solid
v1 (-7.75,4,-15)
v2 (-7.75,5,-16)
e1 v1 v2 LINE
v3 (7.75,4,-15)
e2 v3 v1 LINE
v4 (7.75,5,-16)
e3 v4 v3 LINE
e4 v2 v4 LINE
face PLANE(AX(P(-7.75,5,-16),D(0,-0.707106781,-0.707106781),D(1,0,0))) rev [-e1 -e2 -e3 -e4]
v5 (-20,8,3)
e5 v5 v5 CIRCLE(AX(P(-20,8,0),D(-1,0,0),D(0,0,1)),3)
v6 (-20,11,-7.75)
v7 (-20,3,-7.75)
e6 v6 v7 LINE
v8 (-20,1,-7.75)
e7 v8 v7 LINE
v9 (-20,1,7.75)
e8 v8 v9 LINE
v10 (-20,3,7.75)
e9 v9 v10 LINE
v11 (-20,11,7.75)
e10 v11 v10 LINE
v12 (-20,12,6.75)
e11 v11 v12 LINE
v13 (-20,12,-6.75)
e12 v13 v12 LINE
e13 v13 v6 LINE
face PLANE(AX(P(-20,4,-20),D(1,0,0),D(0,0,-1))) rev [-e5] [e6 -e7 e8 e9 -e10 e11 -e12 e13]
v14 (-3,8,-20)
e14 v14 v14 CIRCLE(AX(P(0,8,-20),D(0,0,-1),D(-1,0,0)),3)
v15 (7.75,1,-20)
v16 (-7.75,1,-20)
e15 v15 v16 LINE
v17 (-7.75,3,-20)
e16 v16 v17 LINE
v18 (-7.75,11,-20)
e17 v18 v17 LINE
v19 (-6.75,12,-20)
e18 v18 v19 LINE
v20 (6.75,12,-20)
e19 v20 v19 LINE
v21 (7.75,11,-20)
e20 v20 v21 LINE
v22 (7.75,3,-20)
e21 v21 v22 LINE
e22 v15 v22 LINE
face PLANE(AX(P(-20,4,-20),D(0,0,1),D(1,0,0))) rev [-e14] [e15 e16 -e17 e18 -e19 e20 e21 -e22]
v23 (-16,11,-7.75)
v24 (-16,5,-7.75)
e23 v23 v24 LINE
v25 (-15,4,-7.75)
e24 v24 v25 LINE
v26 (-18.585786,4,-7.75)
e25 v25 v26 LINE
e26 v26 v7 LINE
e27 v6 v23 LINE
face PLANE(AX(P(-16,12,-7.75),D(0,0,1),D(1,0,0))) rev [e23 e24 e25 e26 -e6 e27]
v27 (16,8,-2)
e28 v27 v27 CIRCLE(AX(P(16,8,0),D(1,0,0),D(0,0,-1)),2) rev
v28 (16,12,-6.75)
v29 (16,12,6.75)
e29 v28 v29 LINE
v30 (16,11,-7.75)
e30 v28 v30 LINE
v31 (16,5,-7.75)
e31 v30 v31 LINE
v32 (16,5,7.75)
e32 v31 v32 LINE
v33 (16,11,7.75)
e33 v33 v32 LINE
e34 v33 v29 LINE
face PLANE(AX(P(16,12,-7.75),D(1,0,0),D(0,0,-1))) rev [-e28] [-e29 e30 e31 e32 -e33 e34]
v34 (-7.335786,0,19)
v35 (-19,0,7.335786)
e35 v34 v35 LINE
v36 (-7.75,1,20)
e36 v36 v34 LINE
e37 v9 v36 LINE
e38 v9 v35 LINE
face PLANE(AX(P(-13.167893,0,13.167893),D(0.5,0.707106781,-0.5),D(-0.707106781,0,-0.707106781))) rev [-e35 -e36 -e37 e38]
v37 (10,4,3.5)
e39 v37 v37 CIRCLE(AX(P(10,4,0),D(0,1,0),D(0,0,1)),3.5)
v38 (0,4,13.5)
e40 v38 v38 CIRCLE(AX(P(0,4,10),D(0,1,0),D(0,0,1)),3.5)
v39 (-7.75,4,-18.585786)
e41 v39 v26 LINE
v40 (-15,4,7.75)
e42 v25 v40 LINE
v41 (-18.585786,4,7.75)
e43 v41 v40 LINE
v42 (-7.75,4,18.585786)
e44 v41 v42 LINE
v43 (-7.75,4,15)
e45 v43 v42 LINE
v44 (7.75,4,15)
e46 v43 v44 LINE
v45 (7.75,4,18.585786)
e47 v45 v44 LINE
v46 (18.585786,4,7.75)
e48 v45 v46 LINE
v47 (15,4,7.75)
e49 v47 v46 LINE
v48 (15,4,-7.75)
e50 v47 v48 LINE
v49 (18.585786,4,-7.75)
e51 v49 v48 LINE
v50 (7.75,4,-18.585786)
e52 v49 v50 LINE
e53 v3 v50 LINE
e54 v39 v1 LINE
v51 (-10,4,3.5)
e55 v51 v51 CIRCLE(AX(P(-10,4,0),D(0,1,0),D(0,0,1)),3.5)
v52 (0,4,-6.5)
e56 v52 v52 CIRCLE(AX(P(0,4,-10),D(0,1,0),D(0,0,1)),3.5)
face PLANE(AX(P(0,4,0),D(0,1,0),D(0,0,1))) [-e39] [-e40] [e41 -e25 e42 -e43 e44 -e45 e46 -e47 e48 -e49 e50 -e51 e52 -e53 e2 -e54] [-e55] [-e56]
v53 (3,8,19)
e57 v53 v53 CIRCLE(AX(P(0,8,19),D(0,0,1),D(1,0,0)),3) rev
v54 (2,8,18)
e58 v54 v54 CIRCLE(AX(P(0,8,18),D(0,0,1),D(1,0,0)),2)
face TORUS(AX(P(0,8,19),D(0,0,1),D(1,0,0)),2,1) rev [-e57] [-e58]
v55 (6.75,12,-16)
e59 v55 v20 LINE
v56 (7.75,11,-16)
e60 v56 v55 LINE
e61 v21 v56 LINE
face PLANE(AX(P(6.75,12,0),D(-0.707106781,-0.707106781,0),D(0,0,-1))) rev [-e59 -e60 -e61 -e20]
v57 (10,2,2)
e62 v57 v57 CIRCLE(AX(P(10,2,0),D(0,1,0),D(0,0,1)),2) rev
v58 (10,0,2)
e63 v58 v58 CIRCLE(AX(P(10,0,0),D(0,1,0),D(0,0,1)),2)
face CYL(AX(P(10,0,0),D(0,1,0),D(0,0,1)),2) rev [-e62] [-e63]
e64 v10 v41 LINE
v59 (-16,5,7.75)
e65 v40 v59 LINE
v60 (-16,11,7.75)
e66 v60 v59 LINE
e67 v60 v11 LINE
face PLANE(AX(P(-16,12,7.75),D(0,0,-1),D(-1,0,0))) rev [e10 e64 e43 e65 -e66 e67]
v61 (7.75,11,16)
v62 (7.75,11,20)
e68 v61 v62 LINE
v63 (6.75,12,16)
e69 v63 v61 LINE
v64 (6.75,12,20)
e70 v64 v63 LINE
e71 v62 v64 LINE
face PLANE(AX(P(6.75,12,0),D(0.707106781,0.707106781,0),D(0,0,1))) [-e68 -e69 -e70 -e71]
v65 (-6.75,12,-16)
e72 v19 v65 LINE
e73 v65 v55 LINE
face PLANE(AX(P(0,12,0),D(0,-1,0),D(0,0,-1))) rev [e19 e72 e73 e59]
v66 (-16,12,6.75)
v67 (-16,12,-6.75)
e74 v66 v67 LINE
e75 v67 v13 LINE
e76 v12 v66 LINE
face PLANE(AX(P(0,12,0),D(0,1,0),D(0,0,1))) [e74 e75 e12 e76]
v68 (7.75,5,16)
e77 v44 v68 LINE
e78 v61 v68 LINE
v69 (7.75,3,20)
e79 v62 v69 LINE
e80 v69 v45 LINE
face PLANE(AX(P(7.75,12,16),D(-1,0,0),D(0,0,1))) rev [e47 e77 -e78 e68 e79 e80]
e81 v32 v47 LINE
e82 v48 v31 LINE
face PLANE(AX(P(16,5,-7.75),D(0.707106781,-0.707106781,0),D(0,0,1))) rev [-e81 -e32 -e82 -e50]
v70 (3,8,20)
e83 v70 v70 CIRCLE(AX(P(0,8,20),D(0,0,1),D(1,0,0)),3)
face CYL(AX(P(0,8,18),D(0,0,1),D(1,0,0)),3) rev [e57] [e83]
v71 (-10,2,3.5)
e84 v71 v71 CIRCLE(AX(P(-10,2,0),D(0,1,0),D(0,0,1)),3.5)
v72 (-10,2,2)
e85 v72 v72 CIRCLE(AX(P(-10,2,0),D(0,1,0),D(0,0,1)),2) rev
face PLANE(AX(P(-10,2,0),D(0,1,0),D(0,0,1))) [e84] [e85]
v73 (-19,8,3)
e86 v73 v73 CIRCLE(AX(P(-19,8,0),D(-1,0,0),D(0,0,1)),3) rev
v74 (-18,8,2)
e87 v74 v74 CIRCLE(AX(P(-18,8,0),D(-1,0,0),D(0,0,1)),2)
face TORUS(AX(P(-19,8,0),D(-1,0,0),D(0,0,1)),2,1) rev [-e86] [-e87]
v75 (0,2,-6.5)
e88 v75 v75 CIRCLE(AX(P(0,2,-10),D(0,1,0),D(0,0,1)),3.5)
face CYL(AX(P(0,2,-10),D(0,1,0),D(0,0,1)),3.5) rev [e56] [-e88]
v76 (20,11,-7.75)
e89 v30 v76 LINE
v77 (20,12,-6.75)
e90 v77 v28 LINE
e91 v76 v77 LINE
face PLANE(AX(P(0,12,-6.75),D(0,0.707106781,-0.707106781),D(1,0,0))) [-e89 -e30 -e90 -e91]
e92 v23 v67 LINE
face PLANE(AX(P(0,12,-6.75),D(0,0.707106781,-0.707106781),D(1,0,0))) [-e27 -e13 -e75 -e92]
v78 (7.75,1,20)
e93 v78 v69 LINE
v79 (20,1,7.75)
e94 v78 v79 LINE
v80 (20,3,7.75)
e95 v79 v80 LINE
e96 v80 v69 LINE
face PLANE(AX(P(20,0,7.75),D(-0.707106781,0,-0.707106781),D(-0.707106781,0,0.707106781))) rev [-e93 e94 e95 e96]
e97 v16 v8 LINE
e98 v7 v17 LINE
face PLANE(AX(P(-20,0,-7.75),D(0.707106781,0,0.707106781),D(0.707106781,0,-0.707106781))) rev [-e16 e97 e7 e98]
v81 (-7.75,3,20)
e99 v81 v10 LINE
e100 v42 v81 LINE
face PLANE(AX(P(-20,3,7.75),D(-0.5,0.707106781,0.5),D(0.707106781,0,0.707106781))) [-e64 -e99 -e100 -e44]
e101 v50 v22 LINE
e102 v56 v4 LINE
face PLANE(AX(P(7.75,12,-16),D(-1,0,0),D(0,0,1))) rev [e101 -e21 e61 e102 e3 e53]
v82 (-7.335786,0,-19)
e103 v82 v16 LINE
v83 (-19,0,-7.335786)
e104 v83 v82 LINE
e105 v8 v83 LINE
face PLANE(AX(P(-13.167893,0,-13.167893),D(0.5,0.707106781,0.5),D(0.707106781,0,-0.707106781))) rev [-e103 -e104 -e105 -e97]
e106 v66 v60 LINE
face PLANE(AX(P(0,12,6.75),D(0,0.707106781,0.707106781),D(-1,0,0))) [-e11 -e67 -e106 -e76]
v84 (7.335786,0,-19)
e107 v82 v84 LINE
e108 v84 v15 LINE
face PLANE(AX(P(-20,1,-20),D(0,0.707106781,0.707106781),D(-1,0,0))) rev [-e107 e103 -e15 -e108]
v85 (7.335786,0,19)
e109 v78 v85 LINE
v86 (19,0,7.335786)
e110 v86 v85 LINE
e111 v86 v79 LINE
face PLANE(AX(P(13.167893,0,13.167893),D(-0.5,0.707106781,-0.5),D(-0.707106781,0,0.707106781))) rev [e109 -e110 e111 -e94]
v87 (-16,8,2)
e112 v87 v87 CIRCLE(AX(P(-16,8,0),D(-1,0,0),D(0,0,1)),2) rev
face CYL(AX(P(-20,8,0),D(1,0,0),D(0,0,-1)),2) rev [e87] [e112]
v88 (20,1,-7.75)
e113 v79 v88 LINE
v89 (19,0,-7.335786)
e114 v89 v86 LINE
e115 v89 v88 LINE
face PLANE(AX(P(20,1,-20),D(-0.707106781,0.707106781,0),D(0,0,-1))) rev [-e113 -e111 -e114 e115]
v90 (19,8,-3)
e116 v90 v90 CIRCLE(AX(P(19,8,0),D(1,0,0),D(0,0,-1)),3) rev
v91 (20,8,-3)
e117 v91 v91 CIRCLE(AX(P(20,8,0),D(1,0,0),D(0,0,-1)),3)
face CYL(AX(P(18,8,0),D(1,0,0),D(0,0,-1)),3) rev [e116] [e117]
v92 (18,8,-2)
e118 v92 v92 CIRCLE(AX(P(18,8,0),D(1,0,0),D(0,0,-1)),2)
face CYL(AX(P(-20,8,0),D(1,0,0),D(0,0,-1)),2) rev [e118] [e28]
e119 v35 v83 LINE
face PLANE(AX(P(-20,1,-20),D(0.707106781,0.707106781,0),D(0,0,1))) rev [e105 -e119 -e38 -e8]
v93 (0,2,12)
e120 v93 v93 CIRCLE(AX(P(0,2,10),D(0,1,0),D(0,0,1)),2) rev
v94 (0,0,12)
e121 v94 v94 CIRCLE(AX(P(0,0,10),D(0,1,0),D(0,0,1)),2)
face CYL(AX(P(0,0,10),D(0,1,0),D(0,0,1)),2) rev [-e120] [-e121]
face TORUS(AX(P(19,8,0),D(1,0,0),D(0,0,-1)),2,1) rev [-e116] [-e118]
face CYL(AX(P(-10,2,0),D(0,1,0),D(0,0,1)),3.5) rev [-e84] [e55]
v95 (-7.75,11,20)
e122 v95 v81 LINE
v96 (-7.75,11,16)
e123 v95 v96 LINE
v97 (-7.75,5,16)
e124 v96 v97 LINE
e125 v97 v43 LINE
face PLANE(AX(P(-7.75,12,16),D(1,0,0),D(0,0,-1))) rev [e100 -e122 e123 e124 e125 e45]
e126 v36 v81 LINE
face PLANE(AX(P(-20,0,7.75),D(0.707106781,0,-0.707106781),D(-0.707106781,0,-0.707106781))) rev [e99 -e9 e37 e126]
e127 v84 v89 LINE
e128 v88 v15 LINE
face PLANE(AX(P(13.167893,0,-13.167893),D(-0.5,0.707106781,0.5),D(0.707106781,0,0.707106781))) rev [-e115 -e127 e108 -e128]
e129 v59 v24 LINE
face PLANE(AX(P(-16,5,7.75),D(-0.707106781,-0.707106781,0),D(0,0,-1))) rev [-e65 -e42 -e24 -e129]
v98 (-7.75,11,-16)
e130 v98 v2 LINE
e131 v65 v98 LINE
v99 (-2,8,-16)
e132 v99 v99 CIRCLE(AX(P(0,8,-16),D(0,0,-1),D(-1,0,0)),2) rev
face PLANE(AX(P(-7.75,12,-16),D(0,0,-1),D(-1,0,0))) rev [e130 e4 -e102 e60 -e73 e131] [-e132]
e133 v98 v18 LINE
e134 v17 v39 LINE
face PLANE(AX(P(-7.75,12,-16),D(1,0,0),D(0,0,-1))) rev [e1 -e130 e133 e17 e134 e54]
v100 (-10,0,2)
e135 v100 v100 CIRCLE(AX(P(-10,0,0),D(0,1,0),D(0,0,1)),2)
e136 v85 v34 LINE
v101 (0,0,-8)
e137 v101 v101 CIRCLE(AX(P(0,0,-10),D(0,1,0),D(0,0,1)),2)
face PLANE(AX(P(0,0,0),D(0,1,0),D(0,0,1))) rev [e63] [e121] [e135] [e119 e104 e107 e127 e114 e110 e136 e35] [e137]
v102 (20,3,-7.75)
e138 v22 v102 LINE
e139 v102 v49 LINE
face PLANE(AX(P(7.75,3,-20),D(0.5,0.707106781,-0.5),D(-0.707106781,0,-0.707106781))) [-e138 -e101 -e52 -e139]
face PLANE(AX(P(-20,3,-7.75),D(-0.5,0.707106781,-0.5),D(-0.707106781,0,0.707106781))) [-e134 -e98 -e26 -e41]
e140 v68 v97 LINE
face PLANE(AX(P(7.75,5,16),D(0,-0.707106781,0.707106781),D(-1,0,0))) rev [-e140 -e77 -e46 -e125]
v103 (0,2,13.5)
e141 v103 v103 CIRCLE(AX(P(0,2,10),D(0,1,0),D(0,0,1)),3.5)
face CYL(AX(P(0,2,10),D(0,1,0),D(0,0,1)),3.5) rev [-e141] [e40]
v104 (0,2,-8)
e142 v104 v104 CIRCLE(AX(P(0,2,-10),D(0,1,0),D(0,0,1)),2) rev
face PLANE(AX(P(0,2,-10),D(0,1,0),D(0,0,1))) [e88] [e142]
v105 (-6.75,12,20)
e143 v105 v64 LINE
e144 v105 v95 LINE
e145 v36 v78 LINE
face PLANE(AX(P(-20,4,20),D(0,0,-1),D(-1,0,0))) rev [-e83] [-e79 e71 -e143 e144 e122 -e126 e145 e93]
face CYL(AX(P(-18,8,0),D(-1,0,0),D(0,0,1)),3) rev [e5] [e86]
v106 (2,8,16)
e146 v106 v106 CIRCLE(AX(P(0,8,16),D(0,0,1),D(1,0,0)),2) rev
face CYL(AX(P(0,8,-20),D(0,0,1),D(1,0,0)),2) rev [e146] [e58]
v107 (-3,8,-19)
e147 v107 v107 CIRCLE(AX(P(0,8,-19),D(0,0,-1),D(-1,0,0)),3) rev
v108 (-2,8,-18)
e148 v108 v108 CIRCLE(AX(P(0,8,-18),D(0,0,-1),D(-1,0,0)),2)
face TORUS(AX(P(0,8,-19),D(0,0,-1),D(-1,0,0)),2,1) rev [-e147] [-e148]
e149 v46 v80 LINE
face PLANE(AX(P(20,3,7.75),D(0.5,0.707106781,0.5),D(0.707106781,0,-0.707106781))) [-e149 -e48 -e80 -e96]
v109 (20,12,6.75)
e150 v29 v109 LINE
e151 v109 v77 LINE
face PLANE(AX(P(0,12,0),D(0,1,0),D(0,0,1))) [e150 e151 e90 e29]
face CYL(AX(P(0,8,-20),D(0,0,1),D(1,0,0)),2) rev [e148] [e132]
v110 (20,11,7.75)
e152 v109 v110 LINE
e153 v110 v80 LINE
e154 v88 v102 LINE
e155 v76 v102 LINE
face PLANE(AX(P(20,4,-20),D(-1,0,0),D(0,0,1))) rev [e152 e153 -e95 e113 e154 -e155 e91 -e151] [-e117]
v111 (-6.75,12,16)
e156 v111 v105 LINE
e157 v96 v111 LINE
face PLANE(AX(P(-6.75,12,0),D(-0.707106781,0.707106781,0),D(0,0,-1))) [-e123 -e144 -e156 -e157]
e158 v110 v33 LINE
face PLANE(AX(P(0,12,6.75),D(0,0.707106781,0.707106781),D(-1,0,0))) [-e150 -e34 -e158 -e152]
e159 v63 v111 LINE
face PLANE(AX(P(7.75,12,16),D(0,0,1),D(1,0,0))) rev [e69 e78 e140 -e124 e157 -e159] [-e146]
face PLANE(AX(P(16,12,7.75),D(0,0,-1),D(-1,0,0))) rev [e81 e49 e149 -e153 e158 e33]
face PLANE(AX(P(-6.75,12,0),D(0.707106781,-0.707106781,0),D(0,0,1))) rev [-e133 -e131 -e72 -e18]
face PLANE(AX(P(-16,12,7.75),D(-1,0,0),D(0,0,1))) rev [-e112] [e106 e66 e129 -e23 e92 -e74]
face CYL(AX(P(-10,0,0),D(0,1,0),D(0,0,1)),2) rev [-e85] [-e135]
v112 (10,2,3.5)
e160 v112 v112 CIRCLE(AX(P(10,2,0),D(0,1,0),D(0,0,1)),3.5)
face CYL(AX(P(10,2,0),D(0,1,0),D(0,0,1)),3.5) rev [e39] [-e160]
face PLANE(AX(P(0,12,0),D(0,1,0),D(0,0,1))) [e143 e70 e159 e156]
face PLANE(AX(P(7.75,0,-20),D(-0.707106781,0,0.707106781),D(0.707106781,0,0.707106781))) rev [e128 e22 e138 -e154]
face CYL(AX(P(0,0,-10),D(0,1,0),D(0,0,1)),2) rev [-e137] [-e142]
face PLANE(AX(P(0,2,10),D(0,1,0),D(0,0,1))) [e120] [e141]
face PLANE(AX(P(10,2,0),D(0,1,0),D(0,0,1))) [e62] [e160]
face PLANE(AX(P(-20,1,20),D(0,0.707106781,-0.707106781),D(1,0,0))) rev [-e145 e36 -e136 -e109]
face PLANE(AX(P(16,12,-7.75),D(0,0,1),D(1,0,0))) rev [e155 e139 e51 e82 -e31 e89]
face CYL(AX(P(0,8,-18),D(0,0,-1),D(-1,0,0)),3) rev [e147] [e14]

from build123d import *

# Parameters (mm, degrees)
SKETCH1_W               = 40
SKETCH1_H               = 40
BOSS_EXTRUDE1_DEPTH     = 4
SKETCH2_R               = 2
CUT_EXTRUDE1_DEPTH      = 29.565713714
CUT_EXTRUDE2_DEPTH      = 29.565713714
SKETCH4_W               = 15.5
SKETCH4_H               = 4
SKETCH4_W_2             = 4
SKETCH4_H_2             = 15.5
BOSS_EXTRUDE2_DEPTH     = 8
CUT_EXTRUDE3_DEPTH      = 43.895221179
CUT_EXTRUDE3_DEPTH_BACK = 5
SKETCH5_R               = 2
CUT_EXTRUDE4_DEPTH      = 43.895221179
CUT_EXTRUDE4_DEPTH_BACK = 5
SKETCH6_R               = 2
SKETCH7_R               = 3
CUT_EXTRUDE5_DEPTH      = 2
CIRPATTERN1_COUNT       = 4
CHAMFER1_SIZE           = 1
FILLET1_R               = 1
CHAMFER2_SIZE           = 1
SKETCH10_R              = 3.5
CUT_EXTRUDE6_DEPTH      = 2


with BuildPart() as part:
    # Sketch1 → Boss-Extrude1 (new body)
    with BuildSketch(Plane(origin=(0, 0, 0), x_dir=(1, 0, 0), z_dir=(0, 1, 0))):
        Rectangle(SKETCH1_W, SKETCH1_H)
    extrude(amount=BOSS_EXTRUDE1_DEPTH)

    # Sketch2 → Cut-Extrude1 (cut, through all)
    with BuildSketch(Plane(origin=(0, 4, 0), x_dir=(1, 0, 0), z_dir=(0, 1, 0))):
        with Locations(Location((-10, 0, 0), (0, 0, 270))):
            Circle(SKETCH2_R)
        with Locations(Location((0, 10, 0), (0, 0, 270))):
            Circle(SKETCH2_R)
        with Locations(Location((10, 0, 0), (0, 0, 270))):
            Circle(SKETCH2_R)
        with Locations(Location((0, -10, 0), (0, 0, 270))):
            Circle(SKETCH2_R)
    extrude(amount=-CUT_EXTRUDE1_DEPTH, mode=Mode.SUBTRACT)

    # Sketch3 → Cut-Extrude2 (cut, through all)
    with BuildSketch(Plane(origin=(0, 4, 0), x_dir=(1, 0, 0), z_dir=(0, 1, 0))):
        Polygon((-7.75, 20), (-20, 20), (-20, 7.75), align=None)
        Polygon((20, 7.75), (20, 20), (7.75, 20), align=None)
        Polygon((20, -7.75), (7.75, -20), (20, -20), align=None)
        Polygon((-20, -7.75), (-7.75, -20), (-20, -20), align=None)
    extrude(amount=-CUT_EXTRUDE2_DEPTH, mode=Mode.SUBTRACT)

    # Sketch4 → Boss-Extrude2 (add)
    with BuildSketch(Plane(origin=(0, 4, 0), x_dir=(1, 0, 0), z_dir=(0, 1, 0))):
        with Locations((0, 18)):
            Rectangle(SKETCH4_W, SKETCH4_H)
        with Locations((18, 0)):
            Rectangle(SKETCH4_W_2, SKETCH4_H_2)
        with Locations((0, -18)):
            Rectangle(SKETCH4_W, SKETCH4_H)
        with Locations((-18, 0)):
            Rectangle(SKETCH4_W_2, SKETCH4_H_2)
    extrude(amount=BOSS_EXTRUDE2_DEPTH)

    # Sketch5 → Cut-Extrude3 (cut, two sides: drawn at the far end of the back side and taken through both)
    with BuildSketch(Plane.ZY.offset(-16).offset(-CUT_EXTRUDE3_DEPTH_BACK)):
        with Locations((0, 8)):
            Circle(SKETCH5_R)
    extrude(amount=CUT_EXTRUDE3_DEPTH + CUT_EXTRUDE3_DEPTH_BACK, mode=Mode.SUBTRACT)

    # Sketch6 → Cut-Extrude4 (cut, two sides: drawn at the far end of the back side and taken through both)
    with BuildSketch(Plane(origin=(0, 0, 16), x_dir=(-1, 0, 0), z_dir=(0, 0, -1)).offset(-CUT_EXTRUDE4_DEPTH_BACK)):
        with Locations(Location((0, 8, 0), (0, 0, 180))):
            Circle(SKETCH6_R)
    extrude(amount=CUT_EXTRUDE4_DEPTH + CUT_EXTRUDE4_DEPTH_BACK, mode=Mode.SUBTRACT)

    # Sketch7 → Cut-Extrude5 (cut)
    with BuildSketch(Plane.XY.offset(20)):
        with Locations((0, 8)):
            Circle(SKETCH7_R)
    cut_extrude5 = extrude(amount=-CUT_EXTRUDE5_DEPTH, mode=Mode.SUBTRACT)

    # CirPattern1: Cut-Extrude5 ×4 about axis
    cirpattern1_axis = Axis((0, 0, 0), (0, 1, 0))
    for i in range(1, CIRPATTERN1_COUNT):
        add(cut_extrude5.rotate(cirpattern1_axis, i * 360 / CIRPATTERN1_COUNT), mode=Mode.SUBTRACT)

    # Chamfer1
    chamfer1_edges = [part.edges().sort_by_distance(p)[0] for p in [
        (7.75, 12, 18),
        (-7.75, 12, 18),
        (-18, 12, 7.75),
        (-18, 12, -7.75),
        (20, 0, 0),
        (0, 0, 20),
        (-20, 0, 0),
        (0, 0, -20),
        (-13.875, 0, 13.875),
        (13.875, 0, 13.875),
        (13.875, 0, -13.875),
        (-13.875, 0, -13.875),
        (7.75, 12, -18),
        (-7.75, 12, -18),
        (18, 12, -7.75),
        (18, 12, 7.75),
    ]]
    chamfer(chamfer1_edges, length=CHAMFER1_SIZE)

    # Fillet1
    fillet1_edges = [part.edges().sort_by_distance(p)[0] for p in [
        (-3, 8, 18),
        (-18, 8, -3),
        (3, 8, -18),
        (18, 8, 3),
    ]]
    fillet(fillet1_edges, radius=FILLET1_R - 0.0001)  # a hair under: the kernel refuses the full size

    # Chamfer2
    chamfer2_edges = [part.edges().sort_by_distance(p)[0] for p in [
        (0, 4, 16),
        (-16, 4, 0),
        (-13.875, 4, 13.875),
        (13.875, 4, 13.875),
        (13.875, 4, -13.875),
        (-13.875, 4, -13.875),
        (0, 4, -16),
        (16, 4, 0),
    ]]
    chamfer(chamfer2_edges, length=CHAMFER2_SIZE)

    # Sketch10 → Cut-Extrude6 (cut)
    with BuildSketch(Plane(origin=(0, 4, 0), x_dir=(1, 0, 0), z_dir=(0, 1, 0))):
        with Locations(Location((-10, 0, 0), (0, 0, 270))):
            Circle(SKETCH10_R)
        with Locations(Location((0, 10, 0), (0, 0, 270))):
            Circle(SKETCH10_R)
        with Locations(Location((10, 0, 0), (0, 0, 270))):
            Circle(SKETCH10_R)
        with Locations(Location((0, -10, 0), (0, 0, 270))):
            Circle(SKETCH10_R)
    extrude(amount=-CUT_EXTRUDE6_DEPTH, mode=Mode.SUBTRACT)


solid = part.part
